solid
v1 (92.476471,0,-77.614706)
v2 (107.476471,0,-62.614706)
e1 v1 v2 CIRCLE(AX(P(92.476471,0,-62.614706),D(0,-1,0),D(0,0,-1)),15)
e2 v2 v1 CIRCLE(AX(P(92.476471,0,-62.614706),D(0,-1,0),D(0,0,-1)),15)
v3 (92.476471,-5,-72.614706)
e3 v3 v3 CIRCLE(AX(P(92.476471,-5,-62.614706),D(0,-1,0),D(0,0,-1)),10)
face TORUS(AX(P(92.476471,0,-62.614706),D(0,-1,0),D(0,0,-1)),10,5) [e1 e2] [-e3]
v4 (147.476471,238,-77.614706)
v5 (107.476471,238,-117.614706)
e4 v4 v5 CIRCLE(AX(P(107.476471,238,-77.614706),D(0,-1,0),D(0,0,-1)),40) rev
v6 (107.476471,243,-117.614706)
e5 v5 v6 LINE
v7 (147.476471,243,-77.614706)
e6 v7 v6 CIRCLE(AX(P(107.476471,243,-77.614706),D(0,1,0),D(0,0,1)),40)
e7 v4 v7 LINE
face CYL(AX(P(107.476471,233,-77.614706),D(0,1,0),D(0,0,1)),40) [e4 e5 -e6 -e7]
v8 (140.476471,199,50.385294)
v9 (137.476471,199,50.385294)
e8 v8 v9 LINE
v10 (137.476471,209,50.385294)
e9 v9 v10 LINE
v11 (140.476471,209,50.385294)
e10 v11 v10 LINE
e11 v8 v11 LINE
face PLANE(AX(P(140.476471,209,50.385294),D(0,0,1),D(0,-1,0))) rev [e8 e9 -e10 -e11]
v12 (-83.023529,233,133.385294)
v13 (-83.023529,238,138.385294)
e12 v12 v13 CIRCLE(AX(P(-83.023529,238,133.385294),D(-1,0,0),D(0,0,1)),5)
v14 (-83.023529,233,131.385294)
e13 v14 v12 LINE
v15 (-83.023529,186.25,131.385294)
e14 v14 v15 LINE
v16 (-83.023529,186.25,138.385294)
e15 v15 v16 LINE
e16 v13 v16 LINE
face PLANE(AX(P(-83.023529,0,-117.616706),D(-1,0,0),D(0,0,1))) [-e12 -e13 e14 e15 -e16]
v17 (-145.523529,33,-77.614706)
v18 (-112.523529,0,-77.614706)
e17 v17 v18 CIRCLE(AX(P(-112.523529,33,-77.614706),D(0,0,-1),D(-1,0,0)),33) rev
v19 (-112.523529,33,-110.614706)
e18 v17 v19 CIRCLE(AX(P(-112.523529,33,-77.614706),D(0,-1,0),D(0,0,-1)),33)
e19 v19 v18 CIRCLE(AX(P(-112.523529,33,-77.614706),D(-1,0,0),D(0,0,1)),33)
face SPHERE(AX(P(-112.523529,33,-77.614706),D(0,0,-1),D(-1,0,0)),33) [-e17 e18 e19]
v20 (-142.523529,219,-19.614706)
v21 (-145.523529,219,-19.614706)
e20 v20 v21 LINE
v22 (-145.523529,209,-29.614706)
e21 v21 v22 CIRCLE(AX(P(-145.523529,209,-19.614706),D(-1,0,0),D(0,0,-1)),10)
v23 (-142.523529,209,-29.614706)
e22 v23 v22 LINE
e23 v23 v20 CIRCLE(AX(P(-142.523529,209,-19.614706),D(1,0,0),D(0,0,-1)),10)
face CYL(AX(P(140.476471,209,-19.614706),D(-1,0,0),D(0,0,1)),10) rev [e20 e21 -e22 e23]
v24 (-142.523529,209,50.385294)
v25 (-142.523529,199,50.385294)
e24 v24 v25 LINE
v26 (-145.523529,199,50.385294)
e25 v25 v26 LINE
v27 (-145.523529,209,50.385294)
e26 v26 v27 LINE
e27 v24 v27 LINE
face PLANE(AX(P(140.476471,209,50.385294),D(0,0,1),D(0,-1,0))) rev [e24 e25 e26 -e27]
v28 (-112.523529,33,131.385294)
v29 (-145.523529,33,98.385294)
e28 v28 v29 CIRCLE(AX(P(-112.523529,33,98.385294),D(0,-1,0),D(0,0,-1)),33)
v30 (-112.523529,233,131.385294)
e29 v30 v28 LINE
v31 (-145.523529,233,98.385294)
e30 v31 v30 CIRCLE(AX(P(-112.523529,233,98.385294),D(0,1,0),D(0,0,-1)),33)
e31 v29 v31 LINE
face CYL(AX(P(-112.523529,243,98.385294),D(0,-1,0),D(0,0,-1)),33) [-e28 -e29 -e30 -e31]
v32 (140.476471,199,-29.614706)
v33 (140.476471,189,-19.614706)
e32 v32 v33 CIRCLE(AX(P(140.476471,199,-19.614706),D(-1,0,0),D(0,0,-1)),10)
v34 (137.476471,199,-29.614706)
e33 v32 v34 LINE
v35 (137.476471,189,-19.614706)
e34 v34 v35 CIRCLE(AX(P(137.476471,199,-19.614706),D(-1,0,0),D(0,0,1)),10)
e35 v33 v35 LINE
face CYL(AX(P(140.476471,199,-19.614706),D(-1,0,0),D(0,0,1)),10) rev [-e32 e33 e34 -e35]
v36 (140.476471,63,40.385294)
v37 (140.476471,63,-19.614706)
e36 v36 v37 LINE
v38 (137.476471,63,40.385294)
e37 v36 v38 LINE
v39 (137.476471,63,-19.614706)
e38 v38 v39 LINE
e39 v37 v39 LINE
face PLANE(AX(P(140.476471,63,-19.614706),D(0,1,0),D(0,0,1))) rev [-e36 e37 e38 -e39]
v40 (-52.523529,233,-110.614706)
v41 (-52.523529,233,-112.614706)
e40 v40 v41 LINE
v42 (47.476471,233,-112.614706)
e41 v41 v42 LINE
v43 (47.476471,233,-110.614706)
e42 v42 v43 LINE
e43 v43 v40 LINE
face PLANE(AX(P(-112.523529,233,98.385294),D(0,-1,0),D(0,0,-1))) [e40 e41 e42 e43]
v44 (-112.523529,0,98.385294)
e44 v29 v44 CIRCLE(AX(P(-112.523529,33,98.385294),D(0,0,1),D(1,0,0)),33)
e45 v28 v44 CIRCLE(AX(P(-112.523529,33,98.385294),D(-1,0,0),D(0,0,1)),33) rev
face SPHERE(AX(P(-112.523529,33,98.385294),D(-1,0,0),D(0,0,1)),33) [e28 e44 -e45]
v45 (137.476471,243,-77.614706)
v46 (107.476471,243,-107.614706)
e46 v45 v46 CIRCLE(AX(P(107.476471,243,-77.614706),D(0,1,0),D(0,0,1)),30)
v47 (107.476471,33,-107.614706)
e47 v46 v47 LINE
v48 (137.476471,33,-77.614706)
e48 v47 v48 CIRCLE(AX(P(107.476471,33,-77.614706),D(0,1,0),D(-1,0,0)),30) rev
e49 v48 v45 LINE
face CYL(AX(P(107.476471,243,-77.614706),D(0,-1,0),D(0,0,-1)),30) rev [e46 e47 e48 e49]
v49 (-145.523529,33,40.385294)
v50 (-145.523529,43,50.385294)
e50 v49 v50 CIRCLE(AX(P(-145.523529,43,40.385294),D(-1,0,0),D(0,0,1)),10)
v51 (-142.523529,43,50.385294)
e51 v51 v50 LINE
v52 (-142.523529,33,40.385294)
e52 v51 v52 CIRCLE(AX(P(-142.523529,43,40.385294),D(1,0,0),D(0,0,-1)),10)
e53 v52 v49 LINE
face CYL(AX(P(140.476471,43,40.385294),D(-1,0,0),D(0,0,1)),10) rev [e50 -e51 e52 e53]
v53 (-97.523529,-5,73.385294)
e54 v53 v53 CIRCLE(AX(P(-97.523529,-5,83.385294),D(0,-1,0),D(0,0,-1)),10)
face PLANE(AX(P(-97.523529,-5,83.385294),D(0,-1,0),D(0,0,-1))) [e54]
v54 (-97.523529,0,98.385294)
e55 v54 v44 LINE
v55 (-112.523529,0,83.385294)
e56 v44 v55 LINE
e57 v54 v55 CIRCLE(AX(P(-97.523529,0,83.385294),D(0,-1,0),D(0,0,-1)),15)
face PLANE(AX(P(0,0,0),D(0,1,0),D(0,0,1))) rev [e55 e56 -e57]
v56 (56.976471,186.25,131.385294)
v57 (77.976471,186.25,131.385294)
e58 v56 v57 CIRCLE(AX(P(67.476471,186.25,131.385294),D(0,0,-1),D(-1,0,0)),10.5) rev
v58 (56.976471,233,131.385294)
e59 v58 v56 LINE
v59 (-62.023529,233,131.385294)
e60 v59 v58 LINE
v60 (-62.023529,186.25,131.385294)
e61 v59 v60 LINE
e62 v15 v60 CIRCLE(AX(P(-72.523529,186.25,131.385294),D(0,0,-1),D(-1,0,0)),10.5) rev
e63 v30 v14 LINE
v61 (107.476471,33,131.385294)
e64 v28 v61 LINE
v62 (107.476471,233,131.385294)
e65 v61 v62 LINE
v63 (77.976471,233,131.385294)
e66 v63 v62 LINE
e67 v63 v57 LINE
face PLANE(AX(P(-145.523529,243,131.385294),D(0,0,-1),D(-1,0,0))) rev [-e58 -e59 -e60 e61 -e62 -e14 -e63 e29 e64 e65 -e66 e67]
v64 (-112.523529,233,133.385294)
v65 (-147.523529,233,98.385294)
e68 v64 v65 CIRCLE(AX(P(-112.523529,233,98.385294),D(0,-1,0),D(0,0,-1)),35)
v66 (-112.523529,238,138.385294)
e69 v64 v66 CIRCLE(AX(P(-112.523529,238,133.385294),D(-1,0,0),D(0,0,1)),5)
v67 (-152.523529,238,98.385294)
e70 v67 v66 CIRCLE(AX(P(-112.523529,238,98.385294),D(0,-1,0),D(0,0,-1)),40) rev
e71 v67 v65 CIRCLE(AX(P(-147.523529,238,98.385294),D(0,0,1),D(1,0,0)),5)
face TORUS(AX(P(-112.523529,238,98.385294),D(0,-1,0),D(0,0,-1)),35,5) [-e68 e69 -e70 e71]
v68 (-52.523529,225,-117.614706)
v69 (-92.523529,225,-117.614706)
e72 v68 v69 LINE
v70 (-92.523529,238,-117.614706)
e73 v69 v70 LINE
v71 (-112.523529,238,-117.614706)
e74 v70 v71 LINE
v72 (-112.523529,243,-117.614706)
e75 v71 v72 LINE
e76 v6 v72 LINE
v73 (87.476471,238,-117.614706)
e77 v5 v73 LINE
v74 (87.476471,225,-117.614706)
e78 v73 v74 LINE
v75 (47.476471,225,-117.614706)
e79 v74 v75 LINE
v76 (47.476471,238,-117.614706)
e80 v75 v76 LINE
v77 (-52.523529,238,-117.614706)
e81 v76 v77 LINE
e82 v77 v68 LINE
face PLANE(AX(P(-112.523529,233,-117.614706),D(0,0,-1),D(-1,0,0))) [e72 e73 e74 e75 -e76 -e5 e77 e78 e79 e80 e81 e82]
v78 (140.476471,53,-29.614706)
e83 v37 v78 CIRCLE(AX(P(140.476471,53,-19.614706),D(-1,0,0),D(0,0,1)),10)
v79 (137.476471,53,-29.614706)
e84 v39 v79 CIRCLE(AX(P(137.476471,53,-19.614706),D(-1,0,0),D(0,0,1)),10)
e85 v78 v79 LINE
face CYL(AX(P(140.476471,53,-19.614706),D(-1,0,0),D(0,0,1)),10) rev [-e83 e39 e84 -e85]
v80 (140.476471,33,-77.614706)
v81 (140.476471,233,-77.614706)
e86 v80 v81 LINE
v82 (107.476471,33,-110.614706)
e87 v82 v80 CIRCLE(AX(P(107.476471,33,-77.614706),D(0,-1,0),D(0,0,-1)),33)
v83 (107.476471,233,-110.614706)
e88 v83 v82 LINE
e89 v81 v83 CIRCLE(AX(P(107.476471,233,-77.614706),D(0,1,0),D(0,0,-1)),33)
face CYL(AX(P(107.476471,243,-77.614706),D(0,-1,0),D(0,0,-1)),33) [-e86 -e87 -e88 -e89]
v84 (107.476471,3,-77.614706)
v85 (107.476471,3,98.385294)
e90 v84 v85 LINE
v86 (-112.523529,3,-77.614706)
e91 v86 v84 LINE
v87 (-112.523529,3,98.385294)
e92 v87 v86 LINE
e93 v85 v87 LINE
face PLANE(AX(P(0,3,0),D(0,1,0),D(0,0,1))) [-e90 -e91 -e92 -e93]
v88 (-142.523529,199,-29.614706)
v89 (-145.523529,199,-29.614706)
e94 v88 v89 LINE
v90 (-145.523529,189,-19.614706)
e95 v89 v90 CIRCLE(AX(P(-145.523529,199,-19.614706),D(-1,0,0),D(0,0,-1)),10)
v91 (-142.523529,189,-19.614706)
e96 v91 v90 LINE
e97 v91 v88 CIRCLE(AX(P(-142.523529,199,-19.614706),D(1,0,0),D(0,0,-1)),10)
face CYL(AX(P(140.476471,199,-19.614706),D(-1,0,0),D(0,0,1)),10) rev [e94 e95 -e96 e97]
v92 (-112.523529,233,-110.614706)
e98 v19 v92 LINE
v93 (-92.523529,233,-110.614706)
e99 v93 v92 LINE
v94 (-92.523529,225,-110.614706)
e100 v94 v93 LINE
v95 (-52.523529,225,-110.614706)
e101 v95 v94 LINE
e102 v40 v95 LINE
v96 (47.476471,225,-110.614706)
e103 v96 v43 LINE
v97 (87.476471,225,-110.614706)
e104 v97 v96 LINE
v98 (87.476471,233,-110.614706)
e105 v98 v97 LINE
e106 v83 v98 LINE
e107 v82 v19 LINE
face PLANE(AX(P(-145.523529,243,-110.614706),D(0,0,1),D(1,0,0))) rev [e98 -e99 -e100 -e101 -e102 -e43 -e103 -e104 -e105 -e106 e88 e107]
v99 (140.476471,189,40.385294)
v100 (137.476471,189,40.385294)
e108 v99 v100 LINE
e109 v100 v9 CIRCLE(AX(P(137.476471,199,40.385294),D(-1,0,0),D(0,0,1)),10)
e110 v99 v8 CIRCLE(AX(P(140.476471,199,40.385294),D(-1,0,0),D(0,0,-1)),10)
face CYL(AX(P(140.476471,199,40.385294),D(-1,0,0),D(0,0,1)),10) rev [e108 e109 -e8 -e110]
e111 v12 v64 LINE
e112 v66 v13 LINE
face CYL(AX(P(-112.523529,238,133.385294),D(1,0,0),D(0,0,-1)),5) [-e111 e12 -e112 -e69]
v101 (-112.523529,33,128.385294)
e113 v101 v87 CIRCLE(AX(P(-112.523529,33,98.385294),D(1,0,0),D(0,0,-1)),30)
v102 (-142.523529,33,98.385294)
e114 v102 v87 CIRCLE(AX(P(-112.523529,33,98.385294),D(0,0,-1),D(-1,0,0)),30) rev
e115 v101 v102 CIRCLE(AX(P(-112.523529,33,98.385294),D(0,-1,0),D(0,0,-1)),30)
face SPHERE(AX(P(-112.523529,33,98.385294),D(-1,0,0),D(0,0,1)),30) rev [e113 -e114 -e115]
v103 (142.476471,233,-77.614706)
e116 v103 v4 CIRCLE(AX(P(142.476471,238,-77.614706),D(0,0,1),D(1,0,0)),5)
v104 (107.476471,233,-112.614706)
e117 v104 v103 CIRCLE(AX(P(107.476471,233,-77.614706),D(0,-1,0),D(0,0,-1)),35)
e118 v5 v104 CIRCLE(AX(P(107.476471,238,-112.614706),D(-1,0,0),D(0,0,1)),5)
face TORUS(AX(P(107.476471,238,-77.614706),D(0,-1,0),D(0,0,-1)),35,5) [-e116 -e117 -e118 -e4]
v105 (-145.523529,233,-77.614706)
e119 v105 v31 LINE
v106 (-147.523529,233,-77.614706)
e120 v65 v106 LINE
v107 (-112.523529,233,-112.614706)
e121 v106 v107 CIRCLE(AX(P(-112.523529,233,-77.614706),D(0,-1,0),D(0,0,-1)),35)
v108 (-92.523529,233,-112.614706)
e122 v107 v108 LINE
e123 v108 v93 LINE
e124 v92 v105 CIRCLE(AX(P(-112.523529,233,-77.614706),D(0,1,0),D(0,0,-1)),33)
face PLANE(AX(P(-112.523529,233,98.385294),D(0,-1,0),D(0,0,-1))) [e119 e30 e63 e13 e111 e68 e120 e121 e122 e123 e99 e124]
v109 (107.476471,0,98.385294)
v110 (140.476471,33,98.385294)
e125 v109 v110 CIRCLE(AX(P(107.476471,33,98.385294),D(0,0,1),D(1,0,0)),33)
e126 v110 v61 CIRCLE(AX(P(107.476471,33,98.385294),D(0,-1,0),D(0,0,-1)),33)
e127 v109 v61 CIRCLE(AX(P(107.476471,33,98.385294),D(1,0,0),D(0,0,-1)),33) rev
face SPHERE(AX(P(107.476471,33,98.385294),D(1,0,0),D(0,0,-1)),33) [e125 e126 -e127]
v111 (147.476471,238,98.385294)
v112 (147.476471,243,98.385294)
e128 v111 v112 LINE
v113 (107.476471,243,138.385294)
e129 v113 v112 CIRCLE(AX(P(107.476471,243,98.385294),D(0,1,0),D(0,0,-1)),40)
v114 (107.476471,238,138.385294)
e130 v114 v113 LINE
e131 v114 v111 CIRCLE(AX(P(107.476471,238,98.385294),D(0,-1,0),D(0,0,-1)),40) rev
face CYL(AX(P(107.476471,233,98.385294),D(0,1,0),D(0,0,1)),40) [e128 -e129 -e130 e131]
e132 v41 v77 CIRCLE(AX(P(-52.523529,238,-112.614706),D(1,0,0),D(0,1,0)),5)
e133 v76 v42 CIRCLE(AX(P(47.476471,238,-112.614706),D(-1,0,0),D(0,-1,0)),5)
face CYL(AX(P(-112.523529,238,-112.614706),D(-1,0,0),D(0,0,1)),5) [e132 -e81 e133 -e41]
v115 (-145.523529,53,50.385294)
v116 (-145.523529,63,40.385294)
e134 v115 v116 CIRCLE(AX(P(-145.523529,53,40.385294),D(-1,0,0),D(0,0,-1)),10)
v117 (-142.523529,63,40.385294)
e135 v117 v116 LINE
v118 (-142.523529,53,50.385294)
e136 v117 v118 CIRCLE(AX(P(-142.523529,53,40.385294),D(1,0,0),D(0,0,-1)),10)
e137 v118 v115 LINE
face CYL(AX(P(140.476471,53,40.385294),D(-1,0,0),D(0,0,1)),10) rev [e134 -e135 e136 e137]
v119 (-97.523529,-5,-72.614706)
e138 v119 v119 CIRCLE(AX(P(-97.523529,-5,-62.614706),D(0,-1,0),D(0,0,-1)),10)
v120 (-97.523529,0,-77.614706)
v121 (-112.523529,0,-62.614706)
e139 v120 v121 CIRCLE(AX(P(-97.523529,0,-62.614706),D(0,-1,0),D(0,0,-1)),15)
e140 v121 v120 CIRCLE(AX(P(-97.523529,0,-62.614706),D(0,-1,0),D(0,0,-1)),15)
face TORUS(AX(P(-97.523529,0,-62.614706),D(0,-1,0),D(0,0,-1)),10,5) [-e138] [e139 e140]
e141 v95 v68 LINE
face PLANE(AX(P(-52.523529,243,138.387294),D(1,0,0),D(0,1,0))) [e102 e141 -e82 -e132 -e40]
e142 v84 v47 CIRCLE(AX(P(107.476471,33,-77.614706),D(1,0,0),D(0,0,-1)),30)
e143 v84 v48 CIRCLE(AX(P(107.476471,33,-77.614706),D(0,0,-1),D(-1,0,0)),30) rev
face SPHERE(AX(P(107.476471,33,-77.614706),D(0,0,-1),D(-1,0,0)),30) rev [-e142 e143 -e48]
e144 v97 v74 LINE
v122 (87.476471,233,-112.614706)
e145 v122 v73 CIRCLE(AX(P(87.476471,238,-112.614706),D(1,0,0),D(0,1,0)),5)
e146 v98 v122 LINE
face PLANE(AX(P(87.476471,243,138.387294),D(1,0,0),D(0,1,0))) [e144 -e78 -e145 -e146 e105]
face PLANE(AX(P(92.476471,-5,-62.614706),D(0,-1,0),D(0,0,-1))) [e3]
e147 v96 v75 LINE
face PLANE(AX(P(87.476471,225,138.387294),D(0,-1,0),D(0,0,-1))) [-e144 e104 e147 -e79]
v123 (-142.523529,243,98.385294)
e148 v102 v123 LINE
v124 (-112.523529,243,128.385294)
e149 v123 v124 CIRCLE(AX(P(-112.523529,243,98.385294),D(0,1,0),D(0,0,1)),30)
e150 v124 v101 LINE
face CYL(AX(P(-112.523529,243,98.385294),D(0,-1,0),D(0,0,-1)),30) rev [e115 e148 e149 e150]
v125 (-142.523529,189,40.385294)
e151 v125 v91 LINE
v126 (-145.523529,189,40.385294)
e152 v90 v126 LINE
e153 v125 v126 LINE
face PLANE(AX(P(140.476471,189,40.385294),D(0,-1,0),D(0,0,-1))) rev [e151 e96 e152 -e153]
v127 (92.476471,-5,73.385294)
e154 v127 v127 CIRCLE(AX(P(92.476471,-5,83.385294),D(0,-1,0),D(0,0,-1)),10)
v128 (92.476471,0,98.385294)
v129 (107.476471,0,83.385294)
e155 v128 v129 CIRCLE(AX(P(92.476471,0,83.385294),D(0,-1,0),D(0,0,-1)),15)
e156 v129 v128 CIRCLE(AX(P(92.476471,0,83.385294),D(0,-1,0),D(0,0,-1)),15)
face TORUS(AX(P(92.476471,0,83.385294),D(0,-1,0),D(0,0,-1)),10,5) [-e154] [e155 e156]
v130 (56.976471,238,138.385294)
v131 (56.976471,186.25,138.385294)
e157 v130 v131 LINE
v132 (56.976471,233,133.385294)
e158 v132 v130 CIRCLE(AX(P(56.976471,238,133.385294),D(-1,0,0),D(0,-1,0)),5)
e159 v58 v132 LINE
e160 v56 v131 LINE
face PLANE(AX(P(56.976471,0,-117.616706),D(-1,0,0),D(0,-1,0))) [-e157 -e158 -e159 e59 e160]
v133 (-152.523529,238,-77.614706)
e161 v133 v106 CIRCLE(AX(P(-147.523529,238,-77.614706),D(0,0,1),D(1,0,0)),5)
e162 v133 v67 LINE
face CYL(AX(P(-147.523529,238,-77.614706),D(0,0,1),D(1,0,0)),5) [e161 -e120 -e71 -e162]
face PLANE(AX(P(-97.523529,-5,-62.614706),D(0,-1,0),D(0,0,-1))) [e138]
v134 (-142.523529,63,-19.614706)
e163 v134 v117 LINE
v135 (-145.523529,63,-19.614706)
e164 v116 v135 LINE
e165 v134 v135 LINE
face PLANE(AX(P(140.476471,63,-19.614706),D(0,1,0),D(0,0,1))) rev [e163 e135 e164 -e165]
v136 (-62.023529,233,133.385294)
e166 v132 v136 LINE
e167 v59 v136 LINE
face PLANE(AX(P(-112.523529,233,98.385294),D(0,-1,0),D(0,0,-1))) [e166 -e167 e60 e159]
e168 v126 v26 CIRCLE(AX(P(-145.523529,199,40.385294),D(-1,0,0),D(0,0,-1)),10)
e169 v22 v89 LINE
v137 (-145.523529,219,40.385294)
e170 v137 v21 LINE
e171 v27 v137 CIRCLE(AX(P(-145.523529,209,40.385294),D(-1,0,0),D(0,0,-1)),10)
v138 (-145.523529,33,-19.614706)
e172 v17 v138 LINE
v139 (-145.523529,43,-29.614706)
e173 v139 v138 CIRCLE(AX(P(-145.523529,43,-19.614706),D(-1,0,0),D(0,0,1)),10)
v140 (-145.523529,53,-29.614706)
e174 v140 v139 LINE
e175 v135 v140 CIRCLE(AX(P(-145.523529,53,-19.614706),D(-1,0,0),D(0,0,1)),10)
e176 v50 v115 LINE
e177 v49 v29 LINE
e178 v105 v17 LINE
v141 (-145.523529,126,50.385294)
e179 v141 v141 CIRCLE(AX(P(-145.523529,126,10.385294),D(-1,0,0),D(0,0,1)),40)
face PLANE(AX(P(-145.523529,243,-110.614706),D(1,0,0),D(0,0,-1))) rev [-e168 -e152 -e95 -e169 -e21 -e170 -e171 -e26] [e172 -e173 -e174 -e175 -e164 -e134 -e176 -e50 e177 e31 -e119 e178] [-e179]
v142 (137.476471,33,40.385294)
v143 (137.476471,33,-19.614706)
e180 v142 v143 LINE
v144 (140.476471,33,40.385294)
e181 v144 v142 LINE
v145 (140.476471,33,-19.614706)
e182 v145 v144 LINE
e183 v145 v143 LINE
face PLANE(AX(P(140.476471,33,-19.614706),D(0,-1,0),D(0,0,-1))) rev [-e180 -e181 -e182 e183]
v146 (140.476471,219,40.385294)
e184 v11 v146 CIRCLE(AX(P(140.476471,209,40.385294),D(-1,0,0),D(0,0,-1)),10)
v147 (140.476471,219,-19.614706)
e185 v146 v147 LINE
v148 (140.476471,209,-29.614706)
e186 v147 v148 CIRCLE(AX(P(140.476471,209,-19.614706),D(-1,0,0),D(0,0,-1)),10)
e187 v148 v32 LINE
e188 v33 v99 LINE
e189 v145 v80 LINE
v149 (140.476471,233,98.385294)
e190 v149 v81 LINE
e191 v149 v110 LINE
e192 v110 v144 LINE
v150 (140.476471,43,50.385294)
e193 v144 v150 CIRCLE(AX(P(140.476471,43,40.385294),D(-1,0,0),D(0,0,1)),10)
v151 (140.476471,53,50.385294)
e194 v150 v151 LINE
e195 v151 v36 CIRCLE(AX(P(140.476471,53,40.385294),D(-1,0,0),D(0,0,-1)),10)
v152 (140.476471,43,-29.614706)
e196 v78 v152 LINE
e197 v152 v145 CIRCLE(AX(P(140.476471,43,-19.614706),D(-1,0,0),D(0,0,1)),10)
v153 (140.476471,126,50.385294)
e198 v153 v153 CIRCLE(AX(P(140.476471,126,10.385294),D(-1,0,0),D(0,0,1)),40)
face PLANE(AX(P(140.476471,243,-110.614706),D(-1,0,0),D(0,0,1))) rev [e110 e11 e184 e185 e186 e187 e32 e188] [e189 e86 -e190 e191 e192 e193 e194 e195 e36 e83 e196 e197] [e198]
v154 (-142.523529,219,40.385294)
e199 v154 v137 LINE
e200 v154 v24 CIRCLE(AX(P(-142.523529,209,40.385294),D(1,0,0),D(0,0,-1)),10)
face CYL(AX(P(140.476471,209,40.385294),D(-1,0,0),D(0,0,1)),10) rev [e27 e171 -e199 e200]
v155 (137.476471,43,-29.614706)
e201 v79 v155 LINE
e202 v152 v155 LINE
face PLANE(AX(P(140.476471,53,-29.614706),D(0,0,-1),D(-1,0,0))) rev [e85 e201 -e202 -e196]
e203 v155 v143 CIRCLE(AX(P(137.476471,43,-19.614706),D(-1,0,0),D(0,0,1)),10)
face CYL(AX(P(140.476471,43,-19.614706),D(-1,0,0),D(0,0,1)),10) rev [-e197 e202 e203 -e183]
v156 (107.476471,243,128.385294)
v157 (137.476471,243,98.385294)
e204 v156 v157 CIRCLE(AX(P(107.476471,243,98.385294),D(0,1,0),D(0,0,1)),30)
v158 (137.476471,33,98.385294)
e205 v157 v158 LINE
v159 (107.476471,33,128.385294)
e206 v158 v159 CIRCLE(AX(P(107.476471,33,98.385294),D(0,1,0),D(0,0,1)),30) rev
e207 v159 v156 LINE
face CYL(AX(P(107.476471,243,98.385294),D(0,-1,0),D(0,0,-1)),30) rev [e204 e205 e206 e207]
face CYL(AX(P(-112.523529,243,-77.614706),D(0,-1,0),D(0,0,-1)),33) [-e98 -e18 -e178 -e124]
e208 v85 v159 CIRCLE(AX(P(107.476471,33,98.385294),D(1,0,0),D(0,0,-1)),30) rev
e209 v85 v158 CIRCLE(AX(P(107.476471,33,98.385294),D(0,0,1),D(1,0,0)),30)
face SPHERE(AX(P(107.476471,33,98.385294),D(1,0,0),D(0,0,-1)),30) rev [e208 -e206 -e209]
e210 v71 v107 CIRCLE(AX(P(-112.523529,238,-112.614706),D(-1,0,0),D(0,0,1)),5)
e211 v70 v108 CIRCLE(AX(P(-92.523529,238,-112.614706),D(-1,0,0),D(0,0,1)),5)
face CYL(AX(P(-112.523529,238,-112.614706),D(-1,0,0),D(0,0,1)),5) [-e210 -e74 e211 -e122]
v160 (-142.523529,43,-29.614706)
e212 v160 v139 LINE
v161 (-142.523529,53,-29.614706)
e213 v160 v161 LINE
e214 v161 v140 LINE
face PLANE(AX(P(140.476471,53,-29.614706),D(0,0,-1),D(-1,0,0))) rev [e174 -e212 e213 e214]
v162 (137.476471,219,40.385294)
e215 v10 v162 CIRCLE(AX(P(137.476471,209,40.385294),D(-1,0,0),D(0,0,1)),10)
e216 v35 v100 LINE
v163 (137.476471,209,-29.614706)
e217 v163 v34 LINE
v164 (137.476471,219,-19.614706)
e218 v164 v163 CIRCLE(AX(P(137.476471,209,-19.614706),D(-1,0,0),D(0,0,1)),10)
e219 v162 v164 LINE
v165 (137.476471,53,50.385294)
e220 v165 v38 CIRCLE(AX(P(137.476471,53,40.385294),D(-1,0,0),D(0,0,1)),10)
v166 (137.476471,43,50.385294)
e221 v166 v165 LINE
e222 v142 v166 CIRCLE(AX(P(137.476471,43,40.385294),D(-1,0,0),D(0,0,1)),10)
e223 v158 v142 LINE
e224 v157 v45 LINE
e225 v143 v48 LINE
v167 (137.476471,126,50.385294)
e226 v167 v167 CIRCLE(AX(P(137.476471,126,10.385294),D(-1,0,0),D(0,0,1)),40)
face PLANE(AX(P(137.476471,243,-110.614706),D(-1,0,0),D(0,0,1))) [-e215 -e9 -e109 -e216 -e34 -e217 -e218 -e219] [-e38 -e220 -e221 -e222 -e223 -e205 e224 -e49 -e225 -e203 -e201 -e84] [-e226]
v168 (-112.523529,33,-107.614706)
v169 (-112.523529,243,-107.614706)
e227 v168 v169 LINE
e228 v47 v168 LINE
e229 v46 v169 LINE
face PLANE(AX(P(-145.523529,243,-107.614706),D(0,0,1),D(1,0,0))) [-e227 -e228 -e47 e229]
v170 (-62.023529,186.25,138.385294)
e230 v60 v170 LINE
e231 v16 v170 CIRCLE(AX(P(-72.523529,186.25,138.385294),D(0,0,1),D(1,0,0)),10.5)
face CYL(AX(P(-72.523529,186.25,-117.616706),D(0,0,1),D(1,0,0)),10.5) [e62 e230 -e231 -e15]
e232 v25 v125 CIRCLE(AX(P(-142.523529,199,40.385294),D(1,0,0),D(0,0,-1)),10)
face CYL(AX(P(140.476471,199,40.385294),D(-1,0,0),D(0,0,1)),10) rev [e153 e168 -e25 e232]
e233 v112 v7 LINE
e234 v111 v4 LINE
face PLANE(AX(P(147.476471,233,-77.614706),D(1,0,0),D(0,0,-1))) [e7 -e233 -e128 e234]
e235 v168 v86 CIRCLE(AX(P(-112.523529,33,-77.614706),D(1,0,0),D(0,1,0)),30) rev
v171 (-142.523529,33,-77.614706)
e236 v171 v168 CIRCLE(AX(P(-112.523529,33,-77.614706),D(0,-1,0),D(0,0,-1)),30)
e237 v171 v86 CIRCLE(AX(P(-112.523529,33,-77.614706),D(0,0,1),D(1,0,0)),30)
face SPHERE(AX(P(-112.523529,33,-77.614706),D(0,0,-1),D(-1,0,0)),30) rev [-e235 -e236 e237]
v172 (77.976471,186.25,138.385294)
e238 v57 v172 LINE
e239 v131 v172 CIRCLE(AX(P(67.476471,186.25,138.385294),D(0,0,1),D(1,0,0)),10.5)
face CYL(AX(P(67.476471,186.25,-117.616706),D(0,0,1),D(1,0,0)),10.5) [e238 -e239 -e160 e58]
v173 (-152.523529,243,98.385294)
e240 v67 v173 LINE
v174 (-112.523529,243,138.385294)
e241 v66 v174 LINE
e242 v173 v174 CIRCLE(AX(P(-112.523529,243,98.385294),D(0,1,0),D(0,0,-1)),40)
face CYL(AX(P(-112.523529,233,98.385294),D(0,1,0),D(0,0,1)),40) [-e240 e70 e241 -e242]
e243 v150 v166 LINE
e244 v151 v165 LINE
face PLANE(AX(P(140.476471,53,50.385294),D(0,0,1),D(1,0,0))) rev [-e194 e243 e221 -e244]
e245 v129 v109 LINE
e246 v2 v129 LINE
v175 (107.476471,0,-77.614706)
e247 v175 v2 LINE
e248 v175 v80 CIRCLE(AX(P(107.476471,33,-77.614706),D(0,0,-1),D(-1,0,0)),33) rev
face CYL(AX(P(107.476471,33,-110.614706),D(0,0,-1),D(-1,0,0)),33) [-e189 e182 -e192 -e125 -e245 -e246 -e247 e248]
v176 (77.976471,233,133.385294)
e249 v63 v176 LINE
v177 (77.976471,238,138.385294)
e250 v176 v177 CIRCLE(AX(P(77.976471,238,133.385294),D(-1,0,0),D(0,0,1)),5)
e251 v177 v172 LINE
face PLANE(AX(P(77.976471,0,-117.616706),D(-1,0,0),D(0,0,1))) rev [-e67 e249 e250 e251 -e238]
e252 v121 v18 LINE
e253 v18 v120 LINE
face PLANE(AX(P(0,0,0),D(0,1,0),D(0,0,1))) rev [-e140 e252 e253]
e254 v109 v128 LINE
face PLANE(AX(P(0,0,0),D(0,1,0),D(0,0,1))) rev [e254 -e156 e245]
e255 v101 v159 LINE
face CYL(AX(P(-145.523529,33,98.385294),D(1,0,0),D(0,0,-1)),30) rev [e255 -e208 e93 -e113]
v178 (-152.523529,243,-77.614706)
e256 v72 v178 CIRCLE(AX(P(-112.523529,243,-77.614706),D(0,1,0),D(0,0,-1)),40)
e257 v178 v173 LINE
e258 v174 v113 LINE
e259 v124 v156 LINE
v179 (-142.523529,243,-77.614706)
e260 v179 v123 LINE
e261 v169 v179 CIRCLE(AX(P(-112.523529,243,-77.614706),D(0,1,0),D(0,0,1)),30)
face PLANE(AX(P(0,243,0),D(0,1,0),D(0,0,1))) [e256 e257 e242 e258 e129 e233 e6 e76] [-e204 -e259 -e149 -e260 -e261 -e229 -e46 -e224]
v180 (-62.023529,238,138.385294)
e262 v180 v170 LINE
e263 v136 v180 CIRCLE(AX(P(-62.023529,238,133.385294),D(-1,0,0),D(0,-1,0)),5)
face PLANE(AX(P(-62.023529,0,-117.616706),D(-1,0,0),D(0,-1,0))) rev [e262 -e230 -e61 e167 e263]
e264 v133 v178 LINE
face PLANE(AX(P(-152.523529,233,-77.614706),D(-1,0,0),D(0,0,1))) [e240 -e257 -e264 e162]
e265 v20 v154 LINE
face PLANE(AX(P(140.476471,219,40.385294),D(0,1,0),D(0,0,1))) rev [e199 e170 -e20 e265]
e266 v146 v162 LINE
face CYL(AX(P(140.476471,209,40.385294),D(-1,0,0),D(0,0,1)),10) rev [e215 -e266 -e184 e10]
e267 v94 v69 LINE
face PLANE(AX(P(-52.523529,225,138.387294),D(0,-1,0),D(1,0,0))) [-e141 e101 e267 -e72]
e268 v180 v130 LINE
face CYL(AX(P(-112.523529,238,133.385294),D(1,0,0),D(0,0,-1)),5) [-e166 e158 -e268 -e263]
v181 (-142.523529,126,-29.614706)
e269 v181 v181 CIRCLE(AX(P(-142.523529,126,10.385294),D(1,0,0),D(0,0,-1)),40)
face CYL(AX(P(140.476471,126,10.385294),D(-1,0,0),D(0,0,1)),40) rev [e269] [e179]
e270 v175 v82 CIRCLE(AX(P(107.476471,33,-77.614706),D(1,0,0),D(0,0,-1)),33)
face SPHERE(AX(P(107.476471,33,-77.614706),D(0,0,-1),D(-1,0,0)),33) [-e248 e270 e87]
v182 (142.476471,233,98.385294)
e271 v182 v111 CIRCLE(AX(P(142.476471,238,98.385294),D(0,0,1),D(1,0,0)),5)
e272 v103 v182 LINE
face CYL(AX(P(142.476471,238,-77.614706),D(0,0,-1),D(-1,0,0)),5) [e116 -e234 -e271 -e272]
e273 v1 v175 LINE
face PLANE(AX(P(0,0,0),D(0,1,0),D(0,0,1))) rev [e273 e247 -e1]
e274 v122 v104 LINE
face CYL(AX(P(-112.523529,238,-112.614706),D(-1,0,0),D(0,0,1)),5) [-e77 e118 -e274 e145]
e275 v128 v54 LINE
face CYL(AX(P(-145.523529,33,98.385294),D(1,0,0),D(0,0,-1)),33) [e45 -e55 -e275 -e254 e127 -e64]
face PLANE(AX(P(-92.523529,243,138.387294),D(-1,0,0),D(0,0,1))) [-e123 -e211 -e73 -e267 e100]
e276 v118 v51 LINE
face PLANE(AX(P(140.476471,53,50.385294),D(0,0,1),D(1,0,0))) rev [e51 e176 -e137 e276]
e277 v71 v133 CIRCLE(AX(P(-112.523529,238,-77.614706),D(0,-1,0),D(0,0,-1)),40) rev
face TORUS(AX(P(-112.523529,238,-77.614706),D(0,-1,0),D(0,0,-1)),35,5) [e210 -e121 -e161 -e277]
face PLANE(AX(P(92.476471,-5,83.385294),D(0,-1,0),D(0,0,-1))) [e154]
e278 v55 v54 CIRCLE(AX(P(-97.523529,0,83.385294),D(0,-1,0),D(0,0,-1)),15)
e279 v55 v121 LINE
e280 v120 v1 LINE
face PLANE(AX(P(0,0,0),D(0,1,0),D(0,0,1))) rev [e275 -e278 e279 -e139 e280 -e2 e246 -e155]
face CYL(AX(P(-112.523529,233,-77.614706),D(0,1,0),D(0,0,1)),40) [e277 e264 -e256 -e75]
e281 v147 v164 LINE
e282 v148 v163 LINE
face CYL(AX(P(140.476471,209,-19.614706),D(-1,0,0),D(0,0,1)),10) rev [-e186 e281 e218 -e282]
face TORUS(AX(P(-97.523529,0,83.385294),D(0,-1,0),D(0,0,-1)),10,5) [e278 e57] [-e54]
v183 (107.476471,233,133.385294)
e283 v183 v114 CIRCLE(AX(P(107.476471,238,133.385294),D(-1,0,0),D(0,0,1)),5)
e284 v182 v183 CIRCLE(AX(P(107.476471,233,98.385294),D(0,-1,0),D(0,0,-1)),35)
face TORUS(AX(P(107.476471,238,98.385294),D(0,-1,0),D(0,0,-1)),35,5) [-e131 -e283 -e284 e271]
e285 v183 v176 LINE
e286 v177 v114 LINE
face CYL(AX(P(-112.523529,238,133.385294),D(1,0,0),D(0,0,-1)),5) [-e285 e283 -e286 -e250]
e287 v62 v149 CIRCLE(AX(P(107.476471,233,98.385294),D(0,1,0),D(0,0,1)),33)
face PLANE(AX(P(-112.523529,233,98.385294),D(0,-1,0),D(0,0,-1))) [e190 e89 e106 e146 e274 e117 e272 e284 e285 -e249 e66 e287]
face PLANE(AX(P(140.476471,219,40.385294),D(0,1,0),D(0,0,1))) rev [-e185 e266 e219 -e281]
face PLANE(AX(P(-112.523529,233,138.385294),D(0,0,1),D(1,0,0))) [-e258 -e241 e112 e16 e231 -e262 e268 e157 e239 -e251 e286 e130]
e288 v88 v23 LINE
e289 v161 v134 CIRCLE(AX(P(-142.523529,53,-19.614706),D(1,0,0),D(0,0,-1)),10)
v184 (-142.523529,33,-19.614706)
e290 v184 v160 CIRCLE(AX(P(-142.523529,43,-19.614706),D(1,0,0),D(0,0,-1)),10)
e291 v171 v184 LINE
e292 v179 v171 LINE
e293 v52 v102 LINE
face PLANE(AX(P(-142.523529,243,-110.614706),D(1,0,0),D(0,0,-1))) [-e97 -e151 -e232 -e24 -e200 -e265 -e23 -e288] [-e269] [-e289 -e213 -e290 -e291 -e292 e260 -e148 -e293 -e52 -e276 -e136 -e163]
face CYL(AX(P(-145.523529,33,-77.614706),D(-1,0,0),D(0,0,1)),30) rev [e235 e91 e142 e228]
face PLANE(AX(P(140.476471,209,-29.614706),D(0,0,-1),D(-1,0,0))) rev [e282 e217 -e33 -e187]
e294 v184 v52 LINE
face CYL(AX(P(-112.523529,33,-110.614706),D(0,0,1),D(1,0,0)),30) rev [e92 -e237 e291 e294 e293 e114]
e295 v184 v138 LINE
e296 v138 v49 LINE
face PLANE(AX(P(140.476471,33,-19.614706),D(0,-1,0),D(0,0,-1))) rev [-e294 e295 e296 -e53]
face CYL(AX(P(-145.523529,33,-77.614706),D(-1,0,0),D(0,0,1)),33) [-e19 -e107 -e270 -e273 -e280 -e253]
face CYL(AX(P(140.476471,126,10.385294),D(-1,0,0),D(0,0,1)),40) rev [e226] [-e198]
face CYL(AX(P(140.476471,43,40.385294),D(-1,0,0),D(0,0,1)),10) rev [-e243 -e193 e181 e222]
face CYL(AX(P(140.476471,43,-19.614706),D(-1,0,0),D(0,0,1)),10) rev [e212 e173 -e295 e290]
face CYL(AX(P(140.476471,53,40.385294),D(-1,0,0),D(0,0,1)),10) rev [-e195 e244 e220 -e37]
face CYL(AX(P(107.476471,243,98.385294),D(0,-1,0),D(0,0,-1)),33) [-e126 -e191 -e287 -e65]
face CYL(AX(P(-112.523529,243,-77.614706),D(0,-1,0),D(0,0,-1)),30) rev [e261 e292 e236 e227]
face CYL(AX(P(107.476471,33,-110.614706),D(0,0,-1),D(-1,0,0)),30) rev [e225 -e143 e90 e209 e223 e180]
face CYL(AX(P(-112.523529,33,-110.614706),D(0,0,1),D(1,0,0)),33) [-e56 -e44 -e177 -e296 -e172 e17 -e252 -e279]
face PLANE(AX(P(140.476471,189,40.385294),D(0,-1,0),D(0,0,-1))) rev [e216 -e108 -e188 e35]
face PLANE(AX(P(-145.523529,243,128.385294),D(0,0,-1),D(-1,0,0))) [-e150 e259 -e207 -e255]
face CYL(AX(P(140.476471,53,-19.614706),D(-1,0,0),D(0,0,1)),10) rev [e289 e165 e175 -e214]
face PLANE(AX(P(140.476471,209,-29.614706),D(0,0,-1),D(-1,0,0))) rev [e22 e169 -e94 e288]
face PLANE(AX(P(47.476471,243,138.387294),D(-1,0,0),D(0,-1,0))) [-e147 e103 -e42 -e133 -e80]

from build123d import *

# Parameters (mm, degrees)
SKETCH1_W           = 286
SKETCH1_H           = 242
BOSS_EXTRUDE1_DEPTH = 243
FILLET1_R           = 33
SHELL1_T            = -3
SKETCH3_R           = 40
CUT_EXTRUDE1_DEPTH  = 398.626829465
BOSS_EXTRUDE2_DEPTH = 10
FILLET2_R           = 5
BOSS_EXTRUDE3_REACH = 386.511
SKETCH7_W           = 40
SKETCH7_H           = 18
BOSS_EXTRUDE5_REACH = 386.511
SKETCH9_R           = 10.5
SKETCH9_W           = 21
SKETCH9_H           = 56.75
SKETCH8_R           = 15
BOSS_EXTRUDE4_DEPTH = 5
FILLET3_R           = 5


with BuildPart() as part:
    # Sketch1 → Boss-Extrude1 (new body)
    with BuildSketch(Plane(origin=(0, 0, 0), x_dir=(1, 0, 0), z_dir=(0, 1, 0))):
        with Locations((-2.523529412, -10.385294118)):
            Rectangle(SKETCH1_W, SKETCH1_H)
    extrude(amount=BOSS_EXTRUDE1_DEPTH)

    # Fillet1
    fillet1_edges = [part.edges().sort_by_distance(p)[0] for p in [
        (-2.523529412, 0, -110.614705882),
        (140.476470588, 0, 10.385294118),
        (-2.523529412, 0, 131.385294118),
        (-145.523529412, 0, 10.385294118),
        (-145.523529412, 121.5, -110.614705882),
        (140.476470588, 121.5, -110.614705882),
        (140.476470588, 121.5, 131.385294118),
        (-145.523529412, 121.5, 131.385294118),
    ]]
    fillet(fillet1_edges, radius=FILLET1_R)

    # Shell1
    shell1_openings = [part.faces().sort_by_distance(p)[0] for p in [
        (-2.523529412, 243, 10.385294118),
    ]]
    offset(amount=SHELL1_T, openings=shell1_openings, kind=Kind.INTERSECTION)

    # Sketch3 → Cut-Extrude1 (cut, through all)
    with BuildSketch(Plane.ZY.offset(145.523529412)):
        with Locations((10.385294118, 126)):
            Circle(SKETCH3_R)
        with BuildLine():
            Line((40.385294118, 219), (-19.614705882, 219))
            ThreePointArc((-19.614705882, 219), (-26.685773694, 216.071067812), (-29.614705882, 209))
            Line((-29.614705882, 209), (-29.614705882, 199))
            ThreePointArc((-29.614705882, 199), (-26.685773694, 191.928932188), (-19.614705882, 189))
            Line((-19.614705882, 189), (40.385294118, 189))
            ThreePointArc((40.385294118, 189), (47.45636193, 191.928932188), (50.385294118, 199))
            Line((50.385294118, 199), (50.385294118, 209))
            ThreePointArc((50.385294118, 209), (47.45636193, 216.071067812), (40.385294118, 219))
        make_face()
        with BuildLine():
            Line((-19.614705882, 63), (40.385294118, 63))
            ThreePointArc((40.385294118, 63), (47.45636193, 60.071067812), (50.385294118, 53))
            Line((50.385294118, 53), (50.385294118, 43))
            ThreePointArc((50.385294118, 43), (47.45636193, 35.928932188), (40.385294118, 33))
            Line((40.385294118, 33), (-19.614705882, 33))
            ThreePointArc((-19.614705882, 33), (-26.685773694, 35.928932188), (-29.614705882, 43))
            Line((-29.614705882, 43), (-29.614705882, 53))
            ThreePointArc((-29.614705882, 53), (-26.685773694, 60.071067812), (-19.614705882, 63))
        make_face()
    extrude(amount=-CUT_EXTRUDE1_DEPTH, mode=Mode.SUBTRACT)

    # Sketch6 → Boss-Extrude2 (add)
    with BuildSketch(Plane(origin=(0, 243, 0), x_dir=(1, 0, 0), z_dir=(0, 1, 0))):
        with BuildLine():
            Line((-112.523529412, 117.614705882), (107.476470588, 117.614705882))
            ThreePointArc((107.476470588, 117.614705882), (135.760741836, 105.89897713), (147.476470588, 77.614705882))
            Line((147.476470588, 77.614705882), (147.476470588, -98.385294118))
            ThreePointArc((147.476470588, -98.385294118), (135.760741836, -126.669565365), (107.476470588, -138.385294118))
            Line((107.476470588, -138.385294118), (-112.523529412, -138.385294118))
            ThreePointArc((-112.523529412, -138.385294118), (-140.807800659, -126.669565365), (-152.523529412, -98.385294118))
            Line((-152.523529412, -98.385294118), (-152.523529412, 77.614705882))
            ThreePointArc((-152.523529412, 77.614705882), (-140.807800659, 105.89897713), (-112.523529412, 117.614705882))
        make_face()
        with BuildLine():
            Line((-112.523529412, 110.614705882), (107.476470588, 110.614705882))
            ThreePointArc((107.476470588, 110.614705882), (130.810994367, 100.949229662), (140.476470588, 77.614705882))
            Line((140.476470588, 77.614705882), (140.476470588, -98.385294118))
            ThreePointArc((140.476470588, -98.385294118), (130.810994367, -121.719817897), (107.476470588, -131.385294118))
            Line((107.476470588, -131.385294118), (-112.523529412, -131.385294118))
            ThreePointArc((-112.523529412, -131.385294118), (-135.858053191, -121.719817897), (-145.523529412, -98.385294118))
            Line((-145.523529412, -98.385294118), (-145.523529412, 77.614705882))
            ThreePointArc((-145.523529412, 77.614705882), (-135.858053191, 100.949229662), (-112.523529412, 110.614705882))
        make_face(mode=Mode.SUBTRACT)
    extrude(amount=-BOSS_EXTRUDE2_DEPTH)

    # Fillet2
    fillet2_edges = [part.edges().sort_by_distance(p)[0] for p in [
        (-140.807800659, 233, 126.669565365),
        (-152.523529412, 233, 10.385294118),
        (-140.807800659, 233, -105.89897713),
        (-2.523529412, 233, -117.614705882),
        (135.760741836, 233, -105.89897713),
        (147.476470588, 233, 10.385294118),
        (135.760741836, 233, 126.669565365),
        (-2.523529412, 233, 138.385294118),
    ]]
    fillet(fillet2_edges, radius=FILLET2_R)

    # Sketch7 → Boss-Extrude3 (add, up to next)
    with BuildSketch(Plane(origin=(0, 0, -117.614705882), x_dir=(-1, 0, 0), z_dir=(0, 0, -1)), mode=Mode.PRIVATE) as boss_extrude3_sk1:
        with Locations((-67.476470588, 234)):
            Rectangle(SKETCH7_W, SKETCH7_H)
    boss_extrude3_tool1 = extrude(boss_extrude3_sk1.sketch, amount=-BOSS_EXTRUDE3_REACH, mode=Mode.PRIVATE) - part.part
    # Sketch7 → Boss-Extrude3 (add, up to next)
    with BuildSketch(Plane(origin=(0, 0, -117.614705882), x_dir=(-1, 0, 0), z_dir=(0, 0, -1)), mode=Mode.PRIVATE) as boss_extrude3_sk2:
        with Locations((72.523529412, 234)):
            Rectangle(SKETCH7_W, SKETCH7_H)
    boss_extrude3_tool2 = extrude(boss_extrude3_sk2.sketch, amount=-BOSS_EXTRUDE3_REACH, mode=Mode.PRIVATE) - part.part
    add(boss_extrude3_tool1.solids().sort_by_distance((67.476471, 234, -117.614706))[0])
    add(boss_extrude3_tool2.solids().sort_by_distance((-72.523529, 234, -117.614706))[0])

    # Sketch9 → Boss-Extrude5 (add, up to next)
    with BuildSketch(Plane.XY.offset(138.385294118), mode=Mode.PRIVATE) as boss_extrude5_sk1:
        with Locations((-72.523529412, 186.25)):
            Circle(SKETCH9_R)
    boss_extrude5_tool1 = extrude(boss_extrude5_sk1.sketch, amount=-BOSS_EXTRUDE5_REACH, mode=Mode.PRIVATE) - part.part
    # Sketch9 → Boss-Extrude5 (add, up to next)
    with BuildSketch(Plane.XY.offset(138.385294118), mode=Mode.PRIVATE) as boss_extrude5_sk2:
        with Locations((67.476470588, 186.25)):
            Circle(SKETCH9_R)
    boss_extrude5_tool2 = extrude(boss_extrude5_sk2.sketch, amount=-BOSS_EXTRUDE5_REACH, mode=Mode.PRIVATE) - part.part
    # Sketch9 → Boss-Extrude5 (add, up to next)
    with BuildSketch(Plane.XY.offset(138.385294118), mode=Mode.PRIVATE) as boss_extrude5_sk3:
        with Locations((-72.523529412, 214.625)):
            Rectangle(SKETCH9_W, SKETCH9_H)
    boss_extrude5_tool3 = extrude(boss_extrude5_sk3.sketch, amount=-BOSS_EXTRUDE5_REACH, mode=Mode.PRIVATE) - part.part
    # Sketch9 → Boss-Extrude5 (add, up to next)
    with BuildSketch(Plane.XY.offset(138.385294118), mode=Mode.PRIVATE) as boss_extrude5_sk4:
        with Locations((67.476470588, 214.625)):
            Rectangle(SKETCH9_W, SKETCH9_H)
    boss_extrude5_tool4 = extrude(boss_extrude5_sk4.sketch, amount=-BOSS_EXTRUDE5_REACH, mode=Mode.PRIVATE) - part.part
    add(boss_extrude5_tool1.solids().sort_by_distance((-72.523529, 186.25, 138.385294))[0])
    add(boss_extrude5_tool2.solids().sort_by_distance((67.476471, 186.25, 138.385294))[0])
    add(boss_extrude5_tool3.solids().sort_by_distance((-72.523529, 214.625, 138.385294))[0])
    add(boss_extrude5_tool4.solids().sort_by_distance((67.476471, 214.625, 138.385294))[0])

    # Sketch8 → Boss-Extrude4 (add)
    with BuildSketch(Plane.XZ):
        with Locations(Location((92.476470588, 83.385294118, 0), (0, 0, 90))):
            Circle(SKETCH8_R)
        with Locations(Location((92.476470588, -62.614705882, 0), (0, 0, 270))):
            Circle(SKETCH8_R)
        with Locations(Location((-97.523529412, 83.385294118, 0), (0, 0, 90))):
            Circle(SKETCH8_R)
        with Locations(Location((-97.523529412, -62.614705882, 0), (0, 0, 270))):
            Circle(SKETCH8_R)
    extrude(amount=BOSS_EXTRUDE4_DEPTH)

    # Fillet3
    fillet3_edges = [part.edges().sort_by_distance(p)[0] for p in [
        (92.476470588, -5, 68.385294118),
        (92.476470588, -5, -47.614705882),
        (-97.523529412, -5, 68.385294118),
        (-97.523529412, -5, -47.614705882),
    ]]
    fillet(fillet3_edges, radius=FILLET3_R - 0.0001)  # a hair under: the kernel refuses the full size


solid = part.part
